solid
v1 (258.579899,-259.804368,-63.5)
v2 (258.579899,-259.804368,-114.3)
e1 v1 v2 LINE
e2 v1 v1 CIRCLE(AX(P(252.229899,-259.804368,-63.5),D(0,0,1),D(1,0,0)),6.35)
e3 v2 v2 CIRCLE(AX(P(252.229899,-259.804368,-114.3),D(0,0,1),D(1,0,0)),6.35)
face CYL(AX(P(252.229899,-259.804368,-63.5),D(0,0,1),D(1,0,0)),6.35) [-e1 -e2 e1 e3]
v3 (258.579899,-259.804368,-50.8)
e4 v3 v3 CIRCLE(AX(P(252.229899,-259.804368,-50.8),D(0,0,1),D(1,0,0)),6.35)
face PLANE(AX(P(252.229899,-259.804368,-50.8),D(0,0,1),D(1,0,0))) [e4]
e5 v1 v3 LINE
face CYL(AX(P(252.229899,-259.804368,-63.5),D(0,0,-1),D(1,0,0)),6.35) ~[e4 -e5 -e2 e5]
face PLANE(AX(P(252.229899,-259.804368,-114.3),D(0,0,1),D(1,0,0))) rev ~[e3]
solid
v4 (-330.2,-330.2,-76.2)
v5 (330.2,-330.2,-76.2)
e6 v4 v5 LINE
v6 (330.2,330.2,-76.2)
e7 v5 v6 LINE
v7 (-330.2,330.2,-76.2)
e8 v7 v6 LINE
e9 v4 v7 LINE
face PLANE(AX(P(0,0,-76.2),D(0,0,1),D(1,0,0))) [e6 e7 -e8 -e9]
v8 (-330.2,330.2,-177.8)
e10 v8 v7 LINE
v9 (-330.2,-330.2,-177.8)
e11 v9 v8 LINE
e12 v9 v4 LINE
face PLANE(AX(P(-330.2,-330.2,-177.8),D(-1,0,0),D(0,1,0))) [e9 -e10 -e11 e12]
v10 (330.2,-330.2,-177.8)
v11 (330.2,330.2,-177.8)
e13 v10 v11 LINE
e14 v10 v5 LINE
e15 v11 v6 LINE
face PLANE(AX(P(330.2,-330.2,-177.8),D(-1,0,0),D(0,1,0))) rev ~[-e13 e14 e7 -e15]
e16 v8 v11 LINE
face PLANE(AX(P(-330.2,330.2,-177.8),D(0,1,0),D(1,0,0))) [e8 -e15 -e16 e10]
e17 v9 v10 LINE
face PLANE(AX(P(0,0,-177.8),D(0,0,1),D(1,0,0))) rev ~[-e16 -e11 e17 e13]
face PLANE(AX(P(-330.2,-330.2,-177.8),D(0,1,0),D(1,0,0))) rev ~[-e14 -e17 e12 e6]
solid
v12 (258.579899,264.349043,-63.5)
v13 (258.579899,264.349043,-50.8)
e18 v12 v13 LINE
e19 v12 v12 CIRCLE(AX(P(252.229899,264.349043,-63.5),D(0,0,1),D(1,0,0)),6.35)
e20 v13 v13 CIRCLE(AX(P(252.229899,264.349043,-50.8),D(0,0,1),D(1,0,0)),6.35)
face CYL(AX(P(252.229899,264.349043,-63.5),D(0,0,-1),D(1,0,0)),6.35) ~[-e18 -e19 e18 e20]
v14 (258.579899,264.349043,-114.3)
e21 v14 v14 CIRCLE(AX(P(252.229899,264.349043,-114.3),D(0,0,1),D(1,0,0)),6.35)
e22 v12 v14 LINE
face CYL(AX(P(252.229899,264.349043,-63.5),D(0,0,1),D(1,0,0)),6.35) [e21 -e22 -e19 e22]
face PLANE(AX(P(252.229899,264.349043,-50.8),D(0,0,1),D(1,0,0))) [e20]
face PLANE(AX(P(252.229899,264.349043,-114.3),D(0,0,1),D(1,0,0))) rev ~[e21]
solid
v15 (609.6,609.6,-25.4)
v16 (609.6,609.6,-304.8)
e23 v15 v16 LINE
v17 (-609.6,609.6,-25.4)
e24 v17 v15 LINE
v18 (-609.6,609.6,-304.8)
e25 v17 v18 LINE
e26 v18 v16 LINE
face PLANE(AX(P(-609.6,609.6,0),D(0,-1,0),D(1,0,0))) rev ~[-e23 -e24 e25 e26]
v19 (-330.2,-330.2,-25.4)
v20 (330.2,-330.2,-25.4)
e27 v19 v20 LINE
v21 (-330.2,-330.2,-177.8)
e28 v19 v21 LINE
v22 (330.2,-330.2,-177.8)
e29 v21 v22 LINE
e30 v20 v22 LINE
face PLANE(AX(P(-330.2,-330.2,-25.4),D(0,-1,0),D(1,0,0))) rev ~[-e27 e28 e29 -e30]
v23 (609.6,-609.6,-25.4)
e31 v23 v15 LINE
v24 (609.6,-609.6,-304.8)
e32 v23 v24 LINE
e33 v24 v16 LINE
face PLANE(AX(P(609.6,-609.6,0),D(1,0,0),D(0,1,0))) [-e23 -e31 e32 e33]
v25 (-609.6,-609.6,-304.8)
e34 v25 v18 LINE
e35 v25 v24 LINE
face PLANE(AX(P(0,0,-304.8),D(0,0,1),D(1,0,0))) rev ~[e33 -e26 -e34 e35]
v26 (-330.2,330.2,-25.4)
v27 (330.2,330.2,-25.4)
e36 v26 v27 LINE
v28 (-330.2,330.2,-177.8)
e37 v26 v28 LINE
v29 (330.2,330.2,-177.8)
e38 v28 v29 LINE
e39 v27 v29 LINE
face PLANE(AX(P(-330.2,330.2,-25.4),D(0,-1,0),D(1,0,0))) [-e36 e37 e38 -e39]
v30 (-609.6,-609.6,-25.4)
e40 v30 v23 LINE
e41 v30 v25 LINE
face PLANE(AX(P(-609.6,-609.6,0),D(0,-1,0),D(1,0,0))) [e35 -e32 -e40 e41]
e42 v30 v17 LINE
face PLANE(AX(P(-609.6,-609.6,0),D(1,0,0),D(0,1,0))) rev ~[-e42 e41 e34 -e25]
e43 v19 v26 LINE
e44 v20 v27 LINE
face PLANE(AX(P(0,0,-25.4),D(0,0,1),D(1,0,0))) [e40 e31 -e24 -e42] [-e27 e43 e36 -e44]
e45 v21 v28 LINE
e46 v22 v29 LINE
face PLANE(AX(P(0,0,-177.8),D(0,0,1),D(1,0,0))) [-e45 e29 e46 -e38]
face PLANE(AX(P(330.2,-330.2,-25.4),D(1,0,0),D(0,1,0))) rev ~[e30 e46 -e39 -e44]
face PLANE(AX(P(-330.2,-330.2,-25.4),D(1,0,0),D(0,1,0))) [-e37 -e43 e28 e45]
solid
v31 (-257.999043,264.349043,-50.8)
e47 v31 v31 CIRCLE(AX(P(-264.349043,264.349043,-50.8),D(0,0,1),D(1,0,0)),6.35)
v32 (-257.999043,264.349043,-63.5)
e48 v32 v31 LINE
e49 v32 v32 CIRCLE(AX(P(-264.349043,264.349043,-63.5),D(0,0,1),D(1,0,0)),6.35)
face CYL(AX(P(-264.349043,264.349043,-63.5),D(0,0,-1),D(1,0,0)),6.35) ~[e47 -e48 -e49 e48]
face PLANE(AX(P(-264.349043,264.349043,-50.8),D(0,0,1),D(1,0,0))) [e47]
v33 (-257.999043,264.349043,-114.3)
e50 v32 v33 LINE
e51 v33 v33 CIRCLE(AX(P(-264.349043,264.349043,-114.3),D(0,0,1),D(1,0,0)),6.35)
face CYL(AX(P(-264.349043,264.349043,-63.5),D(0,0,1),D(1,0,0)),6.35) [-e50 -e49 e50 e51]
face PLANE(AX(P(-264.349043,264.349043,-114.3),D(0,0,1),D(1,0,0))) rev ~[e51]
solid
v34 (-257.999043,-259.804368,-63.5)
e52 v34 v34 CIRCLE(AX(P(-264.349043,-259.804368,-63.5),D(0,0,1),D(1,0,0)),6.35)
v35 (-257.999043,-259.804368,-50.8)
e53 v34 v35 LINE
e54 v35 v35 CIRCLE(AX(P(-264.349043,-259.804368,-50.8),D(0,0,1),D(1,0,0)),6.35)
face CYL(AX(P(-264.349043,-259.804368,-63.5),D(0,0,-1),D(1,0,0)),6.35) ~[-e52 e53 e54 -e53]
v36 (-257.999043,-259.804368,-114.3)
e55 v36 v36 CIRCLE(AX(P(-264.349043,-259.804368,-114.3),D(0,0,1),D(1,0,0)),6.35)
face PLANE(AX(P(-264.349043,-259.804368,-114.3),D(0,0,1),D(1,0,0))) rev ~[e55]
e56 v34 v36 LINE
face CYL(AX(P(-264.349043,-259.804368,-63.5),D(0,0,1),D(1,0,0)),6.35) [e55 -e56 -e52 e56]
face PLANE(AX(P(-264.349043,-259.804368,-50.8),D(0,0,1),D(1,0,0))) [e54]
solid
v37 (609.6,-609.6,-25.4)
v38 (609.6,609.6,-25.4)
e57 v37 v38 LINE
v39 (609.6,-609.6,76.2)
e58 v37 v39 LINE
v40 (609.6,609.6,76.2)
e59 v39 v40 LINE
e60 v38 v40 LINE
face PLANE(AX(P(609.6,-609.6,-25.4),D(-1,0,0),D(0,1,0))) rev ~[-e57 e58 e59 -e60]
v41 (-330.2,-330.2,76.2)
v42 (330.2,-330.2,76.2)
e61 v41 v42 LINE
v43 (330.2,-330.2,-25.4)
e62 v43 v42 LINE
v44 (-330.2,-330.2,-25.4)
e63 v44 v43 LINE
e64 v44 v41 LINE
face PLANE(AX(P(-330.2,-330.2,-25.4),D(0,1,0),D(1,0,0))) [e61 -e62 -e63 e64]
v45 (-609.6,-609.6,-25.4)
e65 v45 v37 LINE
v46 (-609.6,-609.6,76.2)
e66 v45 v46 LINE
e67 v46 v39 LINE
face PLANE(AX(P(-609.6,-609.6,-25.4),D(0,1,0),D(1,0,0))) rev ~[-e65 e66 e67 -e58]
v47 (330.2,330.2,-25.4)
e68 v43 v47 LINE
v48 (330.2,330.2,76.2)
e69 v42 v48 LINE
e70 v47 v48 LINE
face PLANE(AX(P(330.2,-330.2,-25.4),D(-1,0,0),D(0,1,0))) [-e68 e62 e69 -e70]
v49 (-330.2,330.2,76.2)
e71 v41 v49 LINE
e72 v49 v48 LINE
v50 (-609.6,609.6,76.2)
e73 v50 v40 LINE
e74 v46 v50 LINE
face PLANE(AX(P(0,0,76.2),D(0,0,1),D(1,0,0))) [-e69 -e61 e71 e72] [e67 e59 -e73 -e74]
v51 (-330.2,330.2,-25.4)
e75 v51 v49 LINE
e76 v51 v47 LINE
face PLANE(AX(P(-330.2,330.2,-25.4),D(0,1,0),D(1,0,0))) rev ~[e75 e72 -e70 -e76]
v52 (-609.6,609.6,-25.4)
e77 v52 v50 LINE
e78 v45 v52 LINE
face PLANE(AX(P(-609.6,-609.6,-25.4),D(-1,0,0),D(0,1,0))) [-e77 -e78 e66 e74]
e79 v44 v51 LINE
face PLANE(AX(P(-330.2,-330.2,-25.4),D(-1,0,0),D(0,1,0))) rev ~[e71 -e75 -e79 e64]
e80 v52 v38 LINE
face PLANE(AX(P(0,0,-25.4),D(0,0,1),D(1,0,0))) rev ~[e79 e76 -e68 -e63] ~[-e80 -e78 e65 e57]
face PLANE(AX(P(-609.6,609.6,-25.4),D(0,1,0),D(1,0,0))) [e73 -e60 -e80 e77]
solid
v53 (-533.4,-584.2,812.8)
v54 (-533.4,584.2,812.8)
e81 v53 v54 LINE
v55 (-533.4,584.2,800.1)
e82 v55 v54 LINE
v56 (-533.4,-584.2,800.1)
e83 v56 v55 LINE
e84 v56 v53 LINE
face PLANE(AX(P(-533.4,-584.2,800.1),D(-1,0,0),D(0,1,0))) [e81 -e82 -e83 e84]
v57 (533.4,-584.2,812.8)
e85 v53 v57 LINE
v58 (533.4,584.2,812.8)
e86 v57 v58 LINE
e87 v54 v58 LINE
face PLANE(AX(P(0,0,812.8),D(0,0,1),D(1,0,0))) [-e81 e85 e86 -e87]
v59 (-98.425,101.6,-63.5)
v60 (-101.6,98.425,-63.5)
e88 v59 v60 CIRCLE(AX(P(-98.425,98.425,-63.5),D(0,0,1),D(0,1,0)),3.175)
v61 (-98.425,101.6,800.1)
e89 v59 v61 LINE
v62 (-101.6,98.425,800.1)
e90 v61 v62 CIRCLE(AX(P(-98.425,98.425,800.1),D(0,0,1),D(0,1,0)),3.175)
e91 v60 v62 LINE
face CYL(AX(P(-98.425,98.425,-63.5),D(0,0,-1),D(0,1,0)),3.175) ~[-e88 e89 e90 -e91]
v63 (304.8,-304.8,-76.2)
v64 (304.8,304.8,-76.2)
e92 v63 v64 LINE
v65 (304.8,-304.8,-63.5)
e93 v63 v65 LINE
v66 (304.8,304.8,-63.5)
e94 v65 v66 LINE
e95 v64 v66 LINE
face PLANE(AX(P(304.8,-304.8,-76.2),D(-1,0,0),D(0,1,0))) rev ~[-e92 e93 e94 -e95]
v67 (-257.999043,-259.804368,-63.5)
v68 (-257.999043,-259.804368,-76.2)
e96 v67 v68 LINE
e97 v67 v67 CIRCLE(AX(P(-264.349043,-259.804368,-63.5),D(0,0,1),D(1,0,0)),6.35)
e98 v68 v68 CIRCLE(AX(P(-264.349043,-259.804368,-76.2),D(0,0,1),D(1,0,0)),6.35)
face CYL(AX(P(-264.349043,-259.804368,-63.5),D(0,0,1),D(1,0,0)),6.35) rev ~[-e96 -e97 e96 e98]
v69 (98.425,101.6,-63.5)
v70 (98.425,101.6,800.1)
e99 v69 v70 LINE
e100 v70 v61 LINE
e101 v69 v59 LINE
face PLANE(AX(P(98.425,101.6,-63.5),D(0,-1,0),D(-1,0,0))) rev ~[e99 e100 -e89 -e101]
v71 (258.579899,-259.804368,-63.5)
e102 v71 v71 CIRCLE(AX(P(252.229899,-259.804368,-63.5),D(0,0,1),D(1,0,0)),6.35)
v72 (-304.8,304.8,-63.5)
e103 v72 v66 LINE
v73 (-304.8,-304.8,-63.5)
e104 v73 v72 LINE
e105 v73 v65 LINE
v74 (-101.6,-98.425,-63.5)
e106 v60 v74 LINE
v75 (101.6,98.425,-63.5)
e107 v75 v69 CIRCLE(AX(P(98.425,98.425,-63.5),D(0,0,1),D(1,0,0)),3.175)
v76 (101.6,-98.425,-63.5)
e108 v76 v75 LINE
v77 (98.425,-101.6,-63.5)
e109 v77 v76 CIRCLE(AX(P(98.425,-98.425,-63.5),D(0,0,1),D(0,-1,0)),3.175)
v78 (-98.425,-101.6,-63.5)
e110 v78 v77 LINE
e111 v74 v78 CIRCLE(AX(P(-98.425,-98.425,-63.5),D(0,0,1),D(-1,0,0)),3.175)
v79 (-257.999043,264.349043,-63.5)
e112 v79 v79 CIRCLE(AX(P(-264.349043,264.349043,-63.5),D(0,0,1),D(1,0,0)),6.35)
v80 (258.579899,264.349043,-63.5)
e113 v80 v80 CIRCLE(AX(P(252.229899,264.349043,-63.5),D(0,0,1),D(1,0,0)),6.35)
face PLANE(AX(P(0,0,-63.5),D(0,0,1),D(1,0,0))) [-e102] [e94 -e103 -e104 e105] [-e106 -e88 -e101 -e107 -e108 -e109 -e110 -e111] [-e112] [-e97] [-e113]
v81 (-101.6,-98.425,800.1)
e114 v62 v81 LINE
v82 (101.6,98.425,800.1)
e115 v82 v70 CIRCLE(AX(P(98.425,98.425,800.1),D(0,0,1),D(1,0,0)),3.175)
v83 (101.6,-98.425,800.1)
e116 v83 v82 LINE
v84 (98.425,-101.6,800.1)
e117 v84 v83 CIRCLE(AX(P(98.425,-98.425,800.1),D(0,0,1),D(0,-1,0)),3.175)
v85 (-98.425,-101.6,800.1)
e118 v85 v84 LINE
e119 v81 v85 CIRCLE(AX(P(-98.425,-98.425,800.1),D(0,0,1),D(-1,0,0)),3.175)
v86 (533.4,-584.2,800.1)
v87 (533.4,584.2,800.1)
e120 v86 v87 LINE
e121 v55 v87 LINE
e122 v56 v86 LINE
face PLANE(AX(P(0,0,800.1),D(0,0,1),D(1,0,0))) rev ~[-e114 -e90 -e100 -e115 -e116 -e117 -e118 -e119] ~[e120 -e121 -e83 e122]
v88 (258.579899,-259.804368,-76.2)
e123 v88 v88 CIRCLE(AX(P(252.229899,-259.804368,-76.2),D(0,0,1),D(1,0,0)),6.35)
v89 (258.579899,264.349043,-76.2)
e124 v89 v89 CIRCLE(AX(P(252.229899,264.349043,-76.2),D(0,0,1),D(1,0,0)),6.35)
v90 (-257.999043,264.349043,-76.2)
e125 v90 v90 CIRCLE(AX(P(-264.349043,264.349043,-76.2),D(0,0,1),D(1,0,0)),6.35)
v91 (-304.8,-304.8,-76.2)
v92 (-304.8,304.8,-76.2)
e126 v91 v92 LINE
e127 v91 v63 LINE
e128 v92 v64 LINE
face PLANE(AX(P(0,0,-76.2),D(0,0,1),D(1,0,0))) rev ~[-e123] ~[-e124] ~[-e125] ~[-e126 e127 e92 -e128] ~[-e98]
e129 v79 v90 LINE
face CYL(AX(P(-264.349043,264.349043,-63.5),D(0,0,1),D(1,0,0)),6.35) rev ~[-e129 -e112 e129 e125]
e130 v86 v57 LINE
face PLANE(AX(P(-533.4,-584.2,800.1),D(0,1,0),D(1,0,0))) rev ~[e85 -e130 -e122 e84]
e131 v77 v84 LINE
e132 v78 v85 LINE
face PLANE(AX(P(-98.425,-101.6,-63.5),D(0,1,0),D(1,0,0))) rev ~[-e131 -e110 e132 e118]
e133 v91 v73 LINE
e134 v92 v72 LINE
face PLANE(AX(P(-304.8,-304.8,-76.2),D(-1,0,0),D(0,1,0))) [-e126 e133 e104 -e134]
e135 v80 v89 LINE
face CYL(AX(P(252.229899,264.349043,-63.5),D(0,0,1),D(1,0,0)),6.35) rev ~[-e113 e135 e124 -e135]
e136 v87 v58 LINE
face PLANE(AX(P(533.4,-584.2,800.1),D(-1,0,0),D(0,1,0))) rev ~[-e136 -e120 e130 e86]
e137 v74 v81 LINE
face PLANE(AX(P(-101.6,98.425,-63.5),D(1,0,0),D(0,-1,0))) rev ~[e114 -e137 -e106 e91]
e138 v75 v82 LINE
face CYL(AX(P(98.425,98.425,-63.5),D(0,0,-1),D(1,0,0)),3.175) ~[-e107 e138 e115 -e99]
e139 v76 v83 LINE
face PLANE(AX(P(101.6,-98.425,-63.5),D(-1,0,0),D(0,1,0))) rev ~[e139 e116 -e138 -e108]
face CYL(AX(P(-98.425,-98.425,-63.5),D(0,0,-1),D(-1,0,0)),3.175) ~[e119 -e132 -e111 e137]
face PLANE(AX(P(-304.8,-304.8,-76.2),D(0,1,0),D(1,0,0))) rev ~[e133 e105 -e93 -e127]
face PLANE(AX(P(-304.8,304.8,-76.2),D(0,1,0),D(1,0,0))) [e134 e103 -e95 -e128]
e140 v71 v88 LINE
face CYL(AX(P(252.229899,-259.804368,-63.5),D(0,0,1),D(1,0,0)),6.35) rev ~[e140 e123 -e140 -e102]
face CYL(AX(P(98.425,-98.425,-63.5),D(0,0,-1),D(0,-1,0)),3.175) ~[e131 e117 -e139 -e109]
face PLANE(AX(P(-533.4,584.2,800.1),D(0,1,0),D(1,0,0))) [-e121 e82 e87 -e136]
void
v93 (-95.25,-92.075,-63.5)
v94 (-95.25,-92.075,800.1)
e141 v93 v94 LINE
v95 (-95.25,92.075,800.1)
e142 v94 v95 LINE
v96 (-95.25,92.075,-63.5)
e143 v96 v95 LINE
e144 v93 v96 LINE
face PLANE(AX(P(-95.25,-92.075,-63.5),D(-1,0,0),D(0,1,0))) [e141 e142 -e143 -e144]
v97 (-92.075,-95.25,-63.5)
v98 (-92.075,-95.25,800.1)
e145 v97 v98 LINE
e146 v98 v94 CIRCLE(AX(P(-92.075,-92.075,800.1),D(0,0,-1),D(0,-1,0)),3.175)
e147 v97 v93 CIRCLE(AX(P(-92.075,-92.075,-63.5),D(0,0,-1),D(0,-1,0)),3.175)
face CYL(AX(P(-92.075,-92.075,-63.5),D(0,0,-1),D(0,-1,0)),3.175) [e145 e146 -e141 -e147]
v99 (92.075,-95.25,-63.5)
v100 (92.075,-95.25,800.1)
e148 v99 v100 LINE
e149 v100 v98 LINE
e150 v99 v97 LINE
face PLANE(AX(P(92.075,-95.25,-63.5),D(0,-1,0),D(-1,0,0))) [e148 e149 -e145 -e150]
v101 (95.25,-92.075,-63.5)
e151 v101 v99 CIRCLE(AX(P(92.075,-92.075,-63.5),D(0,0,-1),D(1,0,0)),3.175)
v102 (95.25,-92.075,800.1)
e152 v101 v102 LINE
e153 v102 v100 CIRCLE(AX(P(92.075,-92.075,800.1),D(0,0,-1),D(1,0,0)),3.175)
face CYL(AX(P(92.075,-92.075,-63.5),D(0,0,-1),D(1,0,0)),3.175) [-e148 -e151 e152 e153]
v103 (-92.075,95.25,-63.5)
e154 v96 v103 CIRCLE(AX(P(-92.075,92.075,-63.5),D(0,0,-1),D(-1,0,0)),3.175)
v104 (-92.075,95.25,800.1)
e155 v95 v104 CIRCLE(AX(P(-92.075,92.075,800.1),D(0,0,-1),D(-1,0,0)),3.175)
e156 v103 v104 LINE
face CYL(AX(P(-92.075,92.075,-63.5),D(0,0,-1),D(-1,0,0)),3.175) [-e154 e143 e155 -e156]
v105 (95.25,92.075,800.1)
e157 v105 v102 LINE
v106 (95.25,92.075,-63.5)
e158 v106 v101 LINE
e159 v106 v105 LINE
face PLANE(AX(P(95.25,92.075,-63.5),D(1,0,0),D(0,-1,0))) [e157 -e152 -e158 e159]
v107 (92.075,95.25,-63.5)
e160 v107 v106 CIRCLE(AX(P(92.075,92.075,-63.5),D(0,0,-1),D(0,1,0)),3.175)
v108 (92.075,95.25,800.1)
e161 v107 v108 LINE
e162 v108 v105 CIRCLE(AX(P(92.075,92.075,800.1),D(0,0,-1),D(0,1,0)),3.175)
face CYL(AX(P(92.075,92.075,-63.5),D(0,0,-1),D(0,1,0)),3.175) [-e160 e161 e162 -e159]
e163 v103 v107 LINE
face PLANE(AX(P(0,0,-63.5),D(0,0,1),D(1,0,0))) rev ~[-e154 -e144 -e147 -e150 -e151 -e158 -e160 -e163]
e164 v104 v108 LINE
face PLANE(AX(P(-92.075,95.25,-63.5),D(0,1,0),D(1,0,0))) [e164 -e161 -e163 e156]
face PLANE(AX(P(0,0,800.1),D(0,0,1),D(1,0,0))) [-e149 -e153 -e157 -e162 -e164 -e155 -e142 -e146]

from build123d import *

# Parameters (mm, degrees)
F0_W           = 1219.2
F0_H           = 1219.2
F1_DEPTH       = 304.8
F2_DEPTH       = 25.4
F3_W           = 660.4
F3_H           = 660.4
F4_DEPTH       = 152.4
F5_W           = 660.4
F5_H           = 660.4
F6_DEPTH       = 101.6
F7_W           = 1219.2
F7_H           = 1219.2
F7_W_2         = 660.4
F7_H_2         = 660.4
F8_DEPTH       = 101.6
F9_W           = 609.6
F9_H           = 609.6
F10_DEPTH      = 12.7
F12_DEPTH      = 863.6
F13_W          = 1066.8
F13_H          = 1168.4
F14_DEPTH      = 12.7
F15_R          = 6.35
F16_DEPTH      = 76.2
F17_R          = 6.35
F18_DEPTH      = 50.8
F18_DEPTH_BACK = 12.7


with BuildPart() as f1:
    # F0 (on Top) → F1 (new body)
    with BuildSketch(Plane.XY):
        Rectangle(F0_W, F0_H)
    extrude(amount=-F1_DEPTH)

    # F2 (cut): a face of the model
    f2_faces = [f1.faces().sort_by_distance(p)[0] for p in [
        (0, 0, 0),
    ]]
    extrude(f2_faces, amount=-F2_DEPTH, mode=Mode.SUBTRACT)

    # F3 (on face) → F4 (cut)
    with BuildSketch(Plane.XY.offset(-25.4)):
        Rectangle(F3_W, F3_H)
    extrude(amount=-F4_DEPTH, mode=Mode.SUBTRACT)


with BuildPart() as f6:
    # F5 (on face) → F6 (new body)
    with BuildSketch(Plane.XY.offset(-177.8)):
        Rectangle(F5_W, F5_H)
    extrude(amount=F6_DEPTH)


with BuildPart() as f8:
    # F7 (on face) → F8 (new body)
    with BuildSketch(Plane.XY.offset(-25.4)):
        Rectangle(F7_W, F7_H)
        Rectangle(F7_W_2, F7_H_2, mode=Mode.SUBTRACT)
    extrude(amount=F8_DEPTH)


with BuildPart() as f10:
    # F9 (on face) → F10 (new body)
    with BuildSketch(Plane.XY.offset(-76.2)):
        Rectangle(F9_W, F9_H)
    extrude(amount=F10_DEPTH)

    # F11 (on face) → F12 (join)
    with BuildSketch(Plane.XY.offset(-63.5)):
        with BuildLine():
            ThreePointArc((-101.6, -98.425), (-100.6700640303, -100.6700640303), (-98.425, -101.6))
            Line((-98.425, -101.6), (98.425, -101.6))
            ThreePointArc((98.425, -101.6), (100.6700640303, -100.6700640303), (101.6, -98.425))
            Line((101.6, -98.425), (101.6, 98.425))
            ThreePointArc((101.6, 98.425), (100.6700640303, 100.6700640303), (98.425, 101.6))
            Line((98.425, 101.6), (-98.425, 101.6))
            ThreePointArc((-98.425, 101.6), (-100.6700640303, 100.6700640303), (-101.6, 98.425))
            Line((-101.6, 98.425), (-101.6, -98.425))
        make_face()
        with BuildLine():
            ThreePointArc((-95.25, 92.075), (-94.3200640303, 94.3200640303), (-92.075, 95.25))
            Line((-92.075, 95.25), (92.075, 95.25))
            ThreePointArc((92.075, 95.25), (94.3200640303, 94.3200640303), (95.25, 92.075))
            Line((95.25, 92.075), (95.25, -92.075))
            ThreePointArc((95.25, -92.075), (94.3200640303, -94.3200640303), (92.075, -95.25))
            Line((92.075, -95.25), (-92.075, -95.25))
            ThreePointArc((-92.075, -95.25), (-94.3200640303, -94.3200640303), (-95.25, -92.075))
            Line((-95.25, -92.075), (-95.25, 92.075))
        make_face(mode=Mode.SUBTRACT)
    extrude(amount=F12_DEPTH)

    # F13 (on face) → F14 (join)
    with BuildSketch(Plane.XY.offset(800.1)):
        Rectangle(F13_W, F13_H)
    extrude(amount=F14_DEPTH)

    # F15 (on face) → F16 (cut)
    with BuildSketch(Plane.XY.offset(-63.5)):
        with Locations((-264.3490433693, 264.3490433693)):
            Circle(F15_R)
        with Locations((252.229899168, 264.3490433693)):
            Circle(F15_R)
        with Locations((252.229899168, -259.8043680191)):
            Circle(F15_R)
        with Locations((-264.3490433693, -259.8043680191)):
            Circle(F15_R)
    extrude(amount=-F16_DEPTH, mode=Mode.SUBTRACT)


with BuildPart() as f18:
    # F17 (on face) → F18 (new body, two sides)
    with BuildSketch(Plane.XY.offset(-63.5)) as f18_sk:
        with Locations((-264.3490433693, 264.3490433693)):
            Circle(F17_R)
    extrude(amount=-F18_DEPTH)
    extrude(f18_sk.sketch, amount=F18_DEPTH_BACK)


with BuildPart() as f18b:
    # F17 (on face) → F18, piece 2 (new body, two sides)
    with BuildSketch(Plane.XY.offset(-63.5)) as f18_2_sk:
        with Locations((252.229899168, 264.3490433693)):
            Circle(F17_R)
    extrude(amount=-F18_DEPTH)
    extrude(f18_2_sk.sketch, amount=F18_DEPTH_BACK)


with BuildPart() as f18c:
    # F17 (on face) → F18, piece 3 (new body, two sides)
    with BuildSketch(Plane.XY.offset(-63.5)) as f18_3_sk:
        with Locations((252.229899168, -259.8043680191)):
            Circle(F17_R)
    extrude(amount=-F18_DEPTH)
    extrude(f18_3_sk.sketch, amount=F18_DEPTH_BACK)


with BuildPart() as f18d:
    # F17 (on face) → F18, piece 4 (new body, two sides)
    with BuildSketch(Plane.XY.offset(-63.5)) as f18_4_sk:
        with Locations((-264.3490433693, -259.8043680191)):
            Circle(F17_R)
    extrude(amount=-F18_DEPTH)
    extrude(f18_4_sk.sketch, amount=F18_DEPTH_BACK)


solid = Compound([f1.part, f6.part, f8.part, f10.part, f18.part, f18b.part, f18c.part, f18d.part])
